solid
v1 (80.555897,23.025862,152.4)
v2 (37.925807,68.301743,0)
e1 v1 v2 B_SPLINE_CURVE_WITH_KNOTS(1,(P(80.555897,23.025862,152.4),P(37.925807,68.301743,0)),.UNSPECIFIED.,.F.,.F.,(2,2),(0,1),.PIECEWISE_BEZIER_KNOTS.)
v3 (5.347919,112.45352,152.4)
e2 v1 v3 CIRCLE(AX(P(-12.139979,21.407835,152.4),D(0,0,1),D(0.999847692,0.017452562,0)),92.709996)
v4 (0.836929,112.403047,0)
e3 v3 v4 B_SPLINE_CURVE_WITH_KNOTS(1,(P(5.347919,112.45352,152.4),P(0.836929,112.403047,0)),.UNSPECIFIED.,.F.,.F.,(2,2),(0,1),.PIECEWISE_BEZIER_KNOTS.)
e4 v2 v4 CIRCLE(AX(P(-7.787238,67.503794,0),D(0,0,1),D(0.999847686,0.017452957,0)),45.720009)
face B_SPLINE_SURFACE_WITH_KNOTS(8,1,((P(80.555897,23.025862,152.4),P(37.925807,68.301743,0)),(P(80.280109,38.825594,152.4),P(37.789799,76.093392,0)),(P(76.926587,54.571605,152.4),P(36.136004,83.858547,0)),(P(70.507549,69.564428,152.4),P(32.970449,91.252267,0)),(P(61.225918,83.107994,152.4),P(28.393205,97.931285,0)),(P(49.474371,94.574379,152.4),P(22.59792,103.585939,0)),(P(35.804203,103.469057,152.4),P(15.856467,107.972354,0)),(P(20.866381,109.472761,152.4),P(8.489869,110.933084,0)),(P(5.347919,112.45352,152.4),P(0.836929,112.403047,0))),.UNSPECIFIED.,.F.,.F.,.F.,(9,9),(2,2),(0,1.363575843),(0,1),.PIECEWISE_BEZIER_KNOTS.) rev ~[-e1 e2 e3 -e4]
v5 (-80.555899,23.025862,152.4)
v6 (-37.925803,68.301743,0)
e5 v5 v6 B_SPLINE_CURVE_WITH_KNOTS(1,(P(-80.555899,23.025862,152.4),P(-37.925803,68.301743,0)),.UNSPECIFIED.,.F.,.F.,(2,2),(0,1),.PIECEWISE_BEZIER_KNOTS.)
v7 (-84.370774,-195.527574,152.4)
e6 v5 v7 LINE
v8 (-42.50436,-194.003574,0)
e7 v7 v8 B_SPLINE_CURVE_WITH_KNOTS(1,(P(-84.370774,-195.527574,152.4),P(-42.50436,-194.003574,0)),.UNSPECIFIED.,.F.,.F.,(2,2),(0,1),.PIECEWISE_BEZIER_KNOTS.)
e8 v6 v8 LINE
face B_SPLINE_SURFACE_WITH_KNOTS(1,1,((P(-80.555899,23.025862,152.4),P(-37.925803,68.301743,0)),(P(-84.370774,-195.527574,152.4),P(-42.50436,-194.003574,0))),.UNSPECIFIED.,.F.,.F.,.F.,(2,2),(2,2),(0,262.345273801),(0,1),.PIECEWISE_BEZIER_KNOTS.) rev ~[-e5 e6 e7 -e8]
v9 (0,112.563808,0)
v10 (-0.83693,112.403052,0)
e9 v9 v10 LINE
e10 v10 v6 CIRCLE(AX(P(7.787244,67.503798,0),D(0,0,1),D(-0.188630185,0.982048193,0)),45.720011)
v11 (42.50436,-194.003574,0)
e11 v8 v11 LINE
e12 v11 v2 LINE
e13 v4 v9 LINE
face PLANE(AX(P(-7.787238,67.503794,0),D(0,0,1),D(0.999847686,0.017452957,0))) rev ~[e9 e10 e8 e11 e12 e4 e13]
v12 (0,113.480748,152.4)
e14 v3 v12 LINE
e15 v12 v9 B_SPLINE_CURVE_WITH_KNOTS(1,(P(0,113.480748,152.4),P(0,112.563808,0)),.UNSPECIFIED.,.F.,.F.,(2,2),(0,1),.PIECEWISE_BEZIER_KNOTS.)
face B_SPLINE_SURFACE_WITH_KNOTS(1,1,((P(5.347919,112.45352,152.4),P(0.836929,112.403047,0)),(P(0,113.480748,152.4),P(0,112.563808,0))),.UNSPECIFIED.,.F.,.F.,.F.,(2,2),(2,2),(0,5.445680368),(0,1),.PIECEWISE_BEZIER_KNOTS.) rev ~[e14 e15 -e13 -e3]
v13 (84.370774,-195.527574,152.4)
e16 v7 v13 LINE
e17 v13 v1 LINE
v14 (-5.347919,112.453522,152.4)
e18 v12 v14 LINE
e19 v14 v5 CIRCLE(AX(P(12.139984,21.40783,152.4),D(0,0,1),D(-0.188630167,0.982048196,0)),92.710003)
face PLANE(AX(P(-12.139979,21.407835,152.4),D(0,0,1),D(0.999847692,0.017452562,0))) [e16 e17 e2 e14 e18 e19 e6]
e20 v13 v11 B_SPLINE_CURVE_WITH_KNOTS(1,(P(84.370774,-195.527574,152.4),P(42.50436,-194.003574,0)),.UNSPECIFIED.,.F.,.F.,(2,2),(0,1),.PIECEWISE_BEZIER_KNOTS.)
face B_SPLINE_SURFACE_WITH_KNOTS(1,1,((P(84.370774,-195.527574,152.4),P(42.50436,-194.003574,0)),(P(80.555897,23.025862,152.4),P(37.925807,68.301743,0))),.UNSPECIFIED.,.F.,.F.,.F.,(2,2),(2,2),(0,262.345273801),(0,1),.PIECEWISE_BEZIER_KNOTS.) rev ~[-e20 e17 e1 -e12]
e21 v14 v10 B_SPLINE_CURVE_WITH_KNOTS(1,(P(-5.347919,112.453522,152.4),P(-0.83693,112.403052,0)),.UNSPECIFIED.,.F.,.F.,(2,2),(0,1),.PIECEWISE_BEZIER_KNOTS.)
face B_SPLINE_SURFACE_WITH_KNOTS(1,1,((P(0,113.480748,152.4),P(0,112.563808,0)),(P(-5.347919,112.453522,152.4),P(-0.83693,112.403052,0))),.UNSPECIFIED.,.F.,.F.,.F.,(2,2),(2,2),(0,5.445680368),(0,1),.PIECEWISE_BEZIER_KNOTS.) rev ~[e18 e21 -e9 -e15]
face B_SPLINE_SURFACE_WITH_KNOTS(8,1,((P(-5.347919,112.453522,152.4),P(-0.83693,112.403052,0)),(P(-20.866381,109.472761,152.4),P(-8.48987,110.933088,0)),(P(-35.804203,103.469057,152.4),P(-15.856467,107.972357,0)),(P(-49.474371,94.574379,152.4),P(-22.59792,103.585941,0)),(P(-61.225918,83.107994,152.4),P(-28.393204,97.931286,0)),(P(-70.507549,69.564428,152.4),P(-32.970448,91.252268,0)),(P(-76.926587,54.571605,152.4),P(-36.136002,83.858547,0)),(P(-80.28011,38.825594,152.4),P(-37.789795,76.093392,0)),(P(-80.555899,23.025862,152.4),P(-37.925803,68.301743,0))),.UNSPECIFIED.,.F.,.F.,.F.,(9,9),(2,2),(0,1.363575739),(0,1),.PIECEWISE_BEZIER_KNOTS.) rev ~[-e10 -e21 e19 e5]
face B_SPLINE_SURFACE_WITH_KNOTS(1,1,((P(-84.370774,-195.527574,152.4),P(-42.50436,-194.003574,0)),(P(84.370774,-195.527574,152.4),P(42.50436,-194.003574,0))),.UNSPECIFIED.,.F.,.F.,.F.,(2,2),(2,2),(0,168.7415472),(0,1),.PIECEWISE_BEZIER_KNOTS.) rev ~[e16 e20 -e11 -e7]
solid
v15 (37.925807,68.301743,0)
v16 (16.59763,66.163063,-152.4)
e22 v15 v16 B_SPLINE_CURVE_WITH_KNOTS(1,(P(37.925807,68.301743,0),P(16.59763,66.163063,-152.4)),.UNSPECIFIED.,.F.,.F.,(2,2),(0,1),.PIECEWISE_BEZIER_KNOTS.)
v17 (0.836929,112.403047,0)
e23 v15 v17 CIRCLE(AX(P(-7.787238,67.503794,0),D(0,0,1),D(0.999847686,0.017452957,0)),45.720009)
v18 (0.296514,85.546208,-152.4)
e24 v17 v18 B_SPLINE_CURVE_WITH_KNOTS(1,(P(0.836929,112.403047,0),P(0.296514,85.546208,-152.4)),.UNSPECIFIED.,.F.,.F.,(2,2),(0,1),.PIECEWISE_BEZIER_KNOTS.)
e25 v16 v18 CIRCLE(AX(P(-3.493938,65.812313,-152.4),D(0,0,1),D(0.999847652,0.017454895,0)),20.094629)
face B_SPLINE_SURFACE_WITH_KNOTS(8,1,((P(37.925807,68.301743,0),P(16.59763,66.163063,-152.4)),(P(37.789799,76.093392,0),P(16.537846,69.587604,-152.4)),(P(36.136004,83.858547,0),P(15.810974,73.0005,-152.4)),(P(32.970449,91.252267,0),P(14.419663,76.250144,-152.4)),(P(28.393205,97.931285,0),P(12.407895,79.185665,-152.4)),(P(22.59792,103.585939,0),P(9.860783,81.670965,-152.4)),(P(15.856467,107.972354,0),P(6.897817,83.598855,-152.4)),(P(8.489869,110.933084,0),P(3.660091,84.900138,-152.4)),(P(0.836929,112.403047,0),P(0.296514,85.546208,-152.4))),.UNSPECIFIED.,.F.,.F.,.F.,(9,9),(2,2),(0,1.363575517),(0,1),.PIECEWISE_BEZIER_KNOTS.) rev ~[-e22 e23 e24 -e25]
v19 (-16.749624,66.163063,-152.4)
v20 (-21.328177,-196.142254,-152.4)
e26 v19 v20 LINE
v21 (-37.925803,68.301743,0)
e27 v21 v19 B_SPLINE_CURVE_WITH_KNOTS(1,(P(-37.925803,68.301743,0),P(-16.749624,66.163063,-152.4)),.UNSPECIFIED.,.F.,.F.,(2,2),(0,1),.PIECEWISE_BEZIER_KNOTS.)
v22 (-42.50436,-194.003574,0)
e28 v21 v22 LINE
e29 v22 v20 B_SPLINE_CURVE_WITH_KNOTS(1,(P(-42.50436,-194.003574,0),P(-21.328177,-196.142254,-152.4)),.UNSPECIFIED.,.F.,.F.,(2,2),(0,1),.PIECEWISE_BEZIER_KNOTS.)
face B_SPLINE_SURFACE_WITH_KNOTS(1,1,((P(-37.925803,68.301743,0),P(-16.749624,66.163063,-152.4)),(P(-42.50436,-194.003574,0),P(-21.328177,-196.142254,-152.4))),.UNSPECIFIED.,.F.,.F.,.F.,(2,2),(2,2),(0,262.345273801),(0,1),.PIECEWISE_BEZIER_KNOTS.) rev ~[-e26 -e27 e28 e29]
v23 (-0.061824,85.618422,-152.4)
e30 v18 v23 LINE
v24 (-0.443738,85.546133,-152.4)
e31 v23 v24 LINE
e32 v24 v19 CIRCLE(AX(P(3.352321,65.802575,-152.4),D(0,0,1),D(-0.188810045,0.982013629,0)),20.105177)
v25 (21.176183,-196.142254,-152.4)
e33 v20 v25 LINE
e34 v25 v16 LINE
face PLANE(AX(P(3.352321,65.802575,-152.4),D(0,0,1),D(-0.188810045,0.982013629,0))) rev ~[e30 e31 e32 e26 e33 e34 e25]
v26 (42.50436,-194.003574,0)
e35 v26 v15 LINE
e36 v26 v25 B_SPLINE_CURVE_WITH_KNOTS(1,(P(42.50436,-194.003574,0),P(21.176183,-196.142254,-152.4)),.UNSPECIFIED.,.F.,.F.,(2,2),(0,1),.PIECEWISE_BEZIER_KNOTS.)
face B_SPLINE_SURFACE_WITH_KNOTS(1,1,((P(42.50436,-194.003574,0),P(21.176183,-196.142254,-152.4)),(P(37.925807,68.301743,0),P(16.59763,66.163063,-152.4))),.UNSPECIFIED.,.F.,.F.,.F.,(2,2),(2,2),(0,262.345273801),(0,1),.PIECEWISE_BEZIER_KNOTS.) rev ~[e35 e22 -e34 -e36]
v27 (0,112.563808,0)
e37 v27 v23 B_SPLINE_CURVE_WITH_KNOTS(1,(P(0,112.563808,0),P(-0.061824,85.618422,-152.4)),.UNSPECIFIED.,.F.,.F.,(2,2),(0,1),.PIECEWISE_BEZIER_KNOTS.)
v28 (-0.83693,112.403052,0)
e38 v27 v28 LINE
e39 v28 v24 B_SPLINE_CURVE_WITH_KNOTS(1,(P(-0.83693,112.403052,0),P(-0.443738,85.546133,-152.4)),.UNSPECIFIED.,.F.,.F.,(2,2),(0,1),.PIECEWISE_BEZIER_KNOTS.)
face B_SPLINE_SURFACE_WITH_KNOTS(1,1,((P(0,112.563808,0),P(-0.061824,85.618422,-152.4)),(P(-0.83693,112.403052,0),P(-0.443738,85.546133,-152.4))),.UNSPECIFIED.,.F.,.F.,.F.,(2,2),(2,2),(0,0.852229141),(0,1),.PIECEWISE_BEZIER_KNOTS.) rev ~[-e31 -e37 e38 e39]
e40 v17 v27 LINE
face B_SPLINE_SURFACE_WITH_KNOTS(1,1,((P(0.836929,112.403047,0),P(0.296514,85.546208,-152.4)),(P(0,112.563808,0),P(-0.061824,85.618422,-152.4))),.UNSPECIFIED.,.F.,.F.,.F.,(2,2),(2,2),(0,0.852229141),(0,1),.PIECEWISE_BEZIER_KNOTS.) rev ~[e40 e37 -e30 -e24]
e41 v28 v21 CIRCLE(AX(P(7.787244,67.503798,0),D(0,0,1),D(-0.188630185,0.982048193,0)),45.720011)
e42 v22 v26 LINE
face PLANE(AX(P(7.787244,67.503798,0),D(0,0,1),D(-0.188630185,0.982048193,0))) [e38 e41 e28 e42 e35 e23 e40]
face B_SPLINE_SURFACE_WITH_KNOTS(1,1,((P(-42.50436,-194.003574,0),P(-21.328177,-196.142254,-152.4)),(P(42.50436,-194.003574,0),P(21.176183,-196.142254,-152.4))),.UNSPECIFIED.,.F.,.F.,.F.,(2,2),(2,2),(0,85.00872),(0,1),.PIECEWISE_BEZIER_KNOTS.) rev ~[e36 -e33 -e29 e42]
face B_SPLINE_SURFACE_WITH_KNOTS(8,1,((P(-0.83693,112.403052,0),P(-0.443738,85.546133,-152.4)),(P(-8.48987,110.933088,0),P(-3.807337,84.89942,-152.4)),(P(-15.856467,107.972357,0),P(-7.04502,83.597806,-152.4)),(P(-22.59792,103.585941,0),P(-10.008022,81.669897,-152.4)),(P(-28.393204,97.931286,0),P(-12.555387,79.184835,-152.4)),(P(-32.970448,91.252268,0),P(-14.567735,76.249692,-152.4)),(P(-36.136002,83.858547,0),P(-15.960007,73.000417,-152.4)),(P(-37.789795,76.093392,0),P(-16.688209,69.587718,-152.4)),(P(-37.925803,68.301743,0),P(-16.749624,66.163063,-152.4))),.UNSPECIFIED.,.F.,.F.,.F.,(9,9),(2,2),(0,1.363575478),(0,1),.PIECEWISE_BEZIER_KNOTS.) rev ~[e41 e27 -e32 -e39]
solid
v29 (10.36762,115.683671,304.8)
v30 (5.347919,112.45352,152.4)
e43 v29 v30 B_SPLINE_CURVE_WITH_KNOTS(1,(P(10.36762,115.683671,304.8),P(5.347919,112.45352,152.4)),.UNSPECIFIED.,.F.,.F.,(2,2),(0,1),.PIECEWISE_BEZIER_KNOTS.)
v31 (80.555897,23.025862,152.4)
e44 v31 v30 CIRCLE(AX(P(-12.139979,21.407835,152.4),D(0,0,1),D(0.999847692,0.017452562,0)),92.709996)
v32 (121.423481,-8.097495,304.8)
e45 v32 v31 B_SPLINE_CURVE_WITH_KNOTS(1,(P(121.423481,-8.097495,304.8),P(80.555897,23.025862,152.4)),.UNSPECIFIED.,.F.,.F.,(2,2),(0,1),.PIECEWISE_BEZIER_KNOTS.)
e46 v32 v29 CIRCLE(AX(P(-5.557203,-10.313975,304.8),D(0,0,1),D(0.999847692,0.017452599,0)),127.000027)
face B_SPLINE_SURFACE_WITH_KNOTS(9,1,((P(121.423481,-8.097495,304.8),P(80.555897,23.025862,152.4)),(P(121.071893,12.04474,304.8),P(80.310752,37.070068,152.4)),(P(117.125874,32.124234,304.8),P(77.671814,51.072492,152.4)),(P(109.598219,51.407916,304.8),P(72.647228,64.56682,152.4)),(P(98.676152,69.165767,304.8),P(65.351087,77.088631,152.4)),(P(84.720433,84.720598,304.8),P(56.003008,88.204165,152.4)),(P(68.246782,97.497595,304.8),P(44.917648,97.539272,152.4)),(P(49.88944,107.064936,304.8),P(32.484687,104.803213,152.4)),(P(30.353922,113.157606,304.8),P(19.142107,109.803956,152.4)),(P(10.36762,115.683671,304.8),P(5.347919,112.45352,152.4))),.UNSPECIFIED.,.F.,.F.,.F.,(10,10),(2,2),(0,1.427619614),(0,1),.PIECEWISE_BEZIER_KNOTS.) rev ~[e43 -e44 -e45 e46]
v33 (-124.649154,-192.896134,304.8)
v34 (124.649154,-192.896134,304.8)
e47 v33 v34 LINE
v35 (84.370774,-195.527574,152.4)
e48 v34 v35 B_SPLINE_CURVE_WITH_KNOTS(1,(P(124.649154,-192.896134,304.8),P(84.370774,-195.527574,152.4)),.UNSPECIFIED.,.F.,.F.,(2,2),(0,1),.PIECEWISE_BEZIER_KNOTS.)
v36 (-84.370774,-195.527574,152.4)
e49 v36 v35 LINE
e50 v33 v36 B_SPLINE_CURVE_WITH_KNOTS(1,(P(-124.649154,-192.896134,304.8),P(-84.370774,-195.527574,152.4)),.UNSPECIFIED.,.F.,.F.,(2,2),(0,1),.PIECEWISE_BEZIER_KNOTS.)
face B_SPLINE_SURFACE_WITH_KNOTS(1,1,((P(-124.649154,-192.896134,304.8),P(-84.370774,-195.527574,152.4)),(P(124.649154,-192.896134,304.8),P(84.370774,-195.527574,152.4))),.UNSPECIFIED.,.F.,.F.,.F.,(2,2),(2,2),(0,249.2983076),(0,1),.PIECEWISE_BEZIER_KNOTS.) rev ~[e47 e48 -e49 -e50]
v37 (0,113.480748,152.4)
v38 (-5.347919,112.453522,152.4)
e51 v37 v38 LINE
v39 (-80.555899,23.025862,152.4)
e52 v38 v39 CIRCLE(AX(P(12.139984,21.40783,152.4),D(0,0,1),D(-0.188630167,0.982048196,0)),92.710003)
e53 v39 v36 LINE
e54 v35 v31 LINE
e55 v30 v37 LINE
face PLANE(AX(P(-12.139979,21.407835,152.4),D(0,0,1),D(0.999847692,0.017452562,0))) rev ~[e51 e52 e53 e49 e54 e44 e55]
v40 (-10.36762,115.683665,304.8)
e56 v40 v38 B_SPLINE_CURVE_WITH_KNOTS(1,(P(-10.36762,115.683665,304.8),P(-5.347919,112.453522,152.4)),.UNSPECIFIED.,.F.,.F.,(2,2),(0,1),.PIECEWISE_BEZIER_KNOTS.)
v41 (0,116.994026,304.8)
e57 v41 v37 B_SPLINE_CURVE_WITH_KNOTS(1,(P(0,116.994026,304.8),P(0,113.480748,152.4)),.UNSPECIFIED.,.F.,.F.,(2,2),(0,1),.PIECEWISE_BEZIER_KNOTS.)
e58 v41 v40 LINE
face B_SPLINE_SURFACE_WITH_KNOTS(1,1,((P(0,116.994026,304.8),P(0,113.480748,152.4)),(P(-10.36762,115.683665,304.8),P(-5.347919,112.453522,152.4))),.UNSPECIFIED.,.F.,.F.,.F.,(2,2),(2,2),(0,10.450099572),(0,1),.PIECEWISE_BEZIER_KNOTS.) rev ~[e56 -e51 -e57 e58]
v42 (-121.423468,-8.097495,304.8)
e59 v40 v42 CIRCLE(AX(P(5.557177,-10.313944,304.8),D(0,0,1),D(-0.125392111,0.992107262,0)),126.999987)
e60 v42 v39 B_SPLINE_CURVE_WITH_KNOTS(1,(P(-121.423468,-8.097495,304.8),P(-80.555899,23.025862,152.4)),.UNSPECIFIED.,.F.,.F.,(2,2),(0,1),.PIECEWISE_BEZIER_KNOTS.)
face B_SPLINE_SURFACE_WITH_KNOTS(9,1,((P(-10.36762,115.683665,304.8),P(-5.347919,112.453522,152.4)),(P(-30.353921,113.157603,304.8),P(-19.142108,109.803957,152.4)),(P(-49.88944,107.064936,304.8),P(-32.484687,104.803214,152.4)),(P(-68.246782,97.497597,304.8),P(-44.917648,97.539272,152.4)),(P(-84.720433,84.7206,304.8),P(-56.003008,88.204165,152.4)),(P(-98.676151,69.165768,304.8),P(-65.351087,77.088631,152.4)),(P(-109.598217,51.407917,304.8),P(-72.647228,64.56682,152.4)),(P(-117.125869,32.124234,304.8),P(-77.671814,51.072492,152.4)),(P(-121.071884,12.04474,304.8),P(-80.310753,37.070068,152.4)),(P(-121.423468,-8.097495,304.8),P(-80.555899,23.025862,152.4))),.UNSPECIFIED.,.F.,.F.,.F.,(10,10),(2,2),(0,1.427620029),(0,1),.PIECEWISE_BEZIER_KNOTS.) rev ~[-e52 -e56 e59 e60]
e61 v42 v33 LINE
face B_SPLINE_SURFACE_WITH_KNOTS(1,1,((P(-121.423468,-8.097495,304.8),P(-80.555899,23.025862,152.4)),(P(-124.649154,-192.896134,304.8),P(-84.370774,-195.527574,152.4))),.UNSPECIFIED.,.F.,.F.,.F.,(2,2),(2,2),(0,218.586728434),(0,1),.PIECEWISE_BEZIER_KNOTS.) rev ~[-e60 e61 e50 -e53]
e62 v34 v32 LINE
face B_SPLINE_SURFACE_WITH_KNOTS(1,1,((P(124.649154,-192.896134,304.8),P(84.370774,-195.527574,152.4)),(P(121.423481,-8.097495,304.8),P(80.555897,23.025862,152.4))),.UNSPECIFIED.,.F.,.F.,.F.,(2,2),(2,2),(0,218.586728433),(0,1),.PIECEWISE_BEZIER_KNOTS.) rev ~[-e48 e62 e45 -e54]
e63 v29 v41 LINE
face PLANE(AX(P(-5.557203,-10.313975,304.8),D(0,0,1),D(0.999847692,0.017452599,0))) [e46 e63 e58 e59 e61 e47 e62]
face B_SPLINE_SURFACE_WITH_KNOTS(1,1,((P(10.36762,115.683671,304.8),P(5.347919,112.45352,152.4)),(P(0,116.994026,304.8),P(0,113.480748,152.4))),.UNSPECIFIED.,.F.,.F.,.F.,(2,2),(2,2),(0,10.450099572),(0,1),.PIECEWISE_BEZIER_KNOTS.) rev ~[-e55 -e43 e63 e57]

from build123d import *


# Not quite as in the source:
# - ends of sketch curves that miss each other by under 0.0002 mm in the source are joined


with BuildPart() as f7:
    # F3 (on offset) → F7 section 0
    with BuildSketch(Plane.XY.offset(304.8)):
        with BuildLine():
            Line((-124.6491538, -192.8961344), (124.6491538, -192.8961344))
            Line((124.6491538, -192.8961344), (121.4234808, -8.0974946))
            ThreePointArc((121.4234808, -8.0974946), (88.9728976434, 74.4979752801), (10.3676203953, 115.6836712928))
            Line((10.3676203953, 115.6836712928), (0, 116.9940256))
            Line((0, 116.9940256), (-10.3676196, 115.683665))
            ThreePointArc((-10.3676196, 115.683665), (-88.9728976434, 74.4979752801), (-121.4234675032, -8.0974948321))
            Line((-121.4234675032, -8.0974948321), (-124.6491538, -192.8961344))
        make_face()
    # F4 (on offset) → F7 section 1
    with BuildSketch(Plane.XY.offset(152.4)):
        with BuildLine():
            Line((-84.3707736, -195.5275744), (84.3707736, -195.5275744))
            Line((84.3707736, -195.5275744), (80.5558968, 23.025862))
            ThreePointArc((80.5558968, 23.025862), (58.8138267519, 81.0794433275), (5.3479189082, 112.4535200809))
            Line((5.3479189082, 112.4535200809), (0, 113.4807484))
            Line((0, 113.4807484), (-5.3479192, 112.4535216))
            ThreePointArc((-5.3479192, 112.4535216), (-58.8138267519, 81.0794433275), (-80.5558986997, 23.0258620332))
            Line((-80.5558986997, 23.0258620332), (-84.3707736, -195.5275744))
        make_face()
    loft()


with BuildPart() as f8:
    # F4 (on offset) → F8 section 0
    with BuildSketch(Plane.XY.offset(152.4)):
        with BuildLine():
            Line((-84.3707736, -195.5275744), (84.3707736, -195.5275744))
            Line((84.3707736, -195.5275744), (80.5558968, 23.025862))
            ThreePointArc((80.5558968, 23.025862), (58.8138267519, 81.0794433275), (5.3479189082, 112.4535200809))
            Line((5.3479189082, 112.4535200809), (0, 113.4807484))
            Line((0, 113.4807484), (-5.3479192, 112.4535216))
            ThreePointArc((-5.3479192, 112.4535216), (-58.8138267519, 81.0794433275), (-80.5558986997, 23.0258620332))
            Line((-80.5558986997, 23.0258620332), (-84.3707736, -195.5275744))
        make_face()
    # F5 (on Top) → F8 section 1
    with BuildSketch(Plane.XY):
        with BuildLine():
            Line((0, 112.5638084), (-0.83693, 112.4030518))
            ThreePointArc((-0.83693, 112.4030518), (-27.2036803488, 96.9309041513), (-37.9258027274, 68.3017429289))
            Line((-37.9258027274, 68.3017429289), (-42.50436, -194.0035744))
            Line((-42.50436, -194.0035744), (42.50436, -194.0035744))
            Line((42.50436, -194.0035744), (37.9258068, 68.301743))
            ThreePointArc((37.9258068, 68.301743), (27.2036803488, 96.9309041513), (0.8369291121, 112.4030471776))
            Line((0.8369291121, 112.4030471776), (0, 112.5638084))
        make_face()
    loft()


with BuildPart() as f9:
    # F5 (on Top) → F9 section 0
    with BuildSketch(Plane.XY):
        with BuildLine():
            Line((0, 112.5638084), (-0.83693, 112.4030518))
            ThreePointArc((-0.83693, 112.4030518), (-27.2036803488, 96.9309041513), (-37.9258027274, 68.3017429289))
            Line((-37.9258027274, 68.3017429289), (-42.50436, -194.0035744))
            Line((-42.50436, -194.0035744), (42.50436, -194.0035744))
            Line((42.50436, -194.0035744), (37.9258068, 68.301743))
            ThreePointArc((37.9258068, 68.301743), (27.2036803488, 96.9309041513), (0.8369291121, 112.4030471776))
            Line((0.8369291121, 112.4030471776), (0, 112.5638084))
        make_face()
    # F6 (on offset) → F9 section 1
    with BuildSketch(Plane.XY.offset(-152.4)):
        with BuildLine():
            Line((-16.7496236, 66.163063), (-21.3281768, -196.1422544))
            Line((-21.3281768, -196.1422544), (21.1761832, -196.1422544))
            Line((21.1761832, -196.1422544), (16.59763, 66.163063))
            ThreePointArc((16.59763, 66.163063), (11.8850820526, 78.7459853527), (0.2965144503, 85.5462079895))
            Line((0.2965144503, 85.5462079895), (-0.0618236, 85.6184216))
            Line((-0.0618236, 85.6184216), (-0.443738, 85.5461332))
            ThreePointArc((-0.443738, 85.5461332), (-12.0328808906, 78.7452835073), (-16.7496236, 66.163063))
        make_face()
    loft()


solid = Compound([f7.part, f8.part, f9.part])
